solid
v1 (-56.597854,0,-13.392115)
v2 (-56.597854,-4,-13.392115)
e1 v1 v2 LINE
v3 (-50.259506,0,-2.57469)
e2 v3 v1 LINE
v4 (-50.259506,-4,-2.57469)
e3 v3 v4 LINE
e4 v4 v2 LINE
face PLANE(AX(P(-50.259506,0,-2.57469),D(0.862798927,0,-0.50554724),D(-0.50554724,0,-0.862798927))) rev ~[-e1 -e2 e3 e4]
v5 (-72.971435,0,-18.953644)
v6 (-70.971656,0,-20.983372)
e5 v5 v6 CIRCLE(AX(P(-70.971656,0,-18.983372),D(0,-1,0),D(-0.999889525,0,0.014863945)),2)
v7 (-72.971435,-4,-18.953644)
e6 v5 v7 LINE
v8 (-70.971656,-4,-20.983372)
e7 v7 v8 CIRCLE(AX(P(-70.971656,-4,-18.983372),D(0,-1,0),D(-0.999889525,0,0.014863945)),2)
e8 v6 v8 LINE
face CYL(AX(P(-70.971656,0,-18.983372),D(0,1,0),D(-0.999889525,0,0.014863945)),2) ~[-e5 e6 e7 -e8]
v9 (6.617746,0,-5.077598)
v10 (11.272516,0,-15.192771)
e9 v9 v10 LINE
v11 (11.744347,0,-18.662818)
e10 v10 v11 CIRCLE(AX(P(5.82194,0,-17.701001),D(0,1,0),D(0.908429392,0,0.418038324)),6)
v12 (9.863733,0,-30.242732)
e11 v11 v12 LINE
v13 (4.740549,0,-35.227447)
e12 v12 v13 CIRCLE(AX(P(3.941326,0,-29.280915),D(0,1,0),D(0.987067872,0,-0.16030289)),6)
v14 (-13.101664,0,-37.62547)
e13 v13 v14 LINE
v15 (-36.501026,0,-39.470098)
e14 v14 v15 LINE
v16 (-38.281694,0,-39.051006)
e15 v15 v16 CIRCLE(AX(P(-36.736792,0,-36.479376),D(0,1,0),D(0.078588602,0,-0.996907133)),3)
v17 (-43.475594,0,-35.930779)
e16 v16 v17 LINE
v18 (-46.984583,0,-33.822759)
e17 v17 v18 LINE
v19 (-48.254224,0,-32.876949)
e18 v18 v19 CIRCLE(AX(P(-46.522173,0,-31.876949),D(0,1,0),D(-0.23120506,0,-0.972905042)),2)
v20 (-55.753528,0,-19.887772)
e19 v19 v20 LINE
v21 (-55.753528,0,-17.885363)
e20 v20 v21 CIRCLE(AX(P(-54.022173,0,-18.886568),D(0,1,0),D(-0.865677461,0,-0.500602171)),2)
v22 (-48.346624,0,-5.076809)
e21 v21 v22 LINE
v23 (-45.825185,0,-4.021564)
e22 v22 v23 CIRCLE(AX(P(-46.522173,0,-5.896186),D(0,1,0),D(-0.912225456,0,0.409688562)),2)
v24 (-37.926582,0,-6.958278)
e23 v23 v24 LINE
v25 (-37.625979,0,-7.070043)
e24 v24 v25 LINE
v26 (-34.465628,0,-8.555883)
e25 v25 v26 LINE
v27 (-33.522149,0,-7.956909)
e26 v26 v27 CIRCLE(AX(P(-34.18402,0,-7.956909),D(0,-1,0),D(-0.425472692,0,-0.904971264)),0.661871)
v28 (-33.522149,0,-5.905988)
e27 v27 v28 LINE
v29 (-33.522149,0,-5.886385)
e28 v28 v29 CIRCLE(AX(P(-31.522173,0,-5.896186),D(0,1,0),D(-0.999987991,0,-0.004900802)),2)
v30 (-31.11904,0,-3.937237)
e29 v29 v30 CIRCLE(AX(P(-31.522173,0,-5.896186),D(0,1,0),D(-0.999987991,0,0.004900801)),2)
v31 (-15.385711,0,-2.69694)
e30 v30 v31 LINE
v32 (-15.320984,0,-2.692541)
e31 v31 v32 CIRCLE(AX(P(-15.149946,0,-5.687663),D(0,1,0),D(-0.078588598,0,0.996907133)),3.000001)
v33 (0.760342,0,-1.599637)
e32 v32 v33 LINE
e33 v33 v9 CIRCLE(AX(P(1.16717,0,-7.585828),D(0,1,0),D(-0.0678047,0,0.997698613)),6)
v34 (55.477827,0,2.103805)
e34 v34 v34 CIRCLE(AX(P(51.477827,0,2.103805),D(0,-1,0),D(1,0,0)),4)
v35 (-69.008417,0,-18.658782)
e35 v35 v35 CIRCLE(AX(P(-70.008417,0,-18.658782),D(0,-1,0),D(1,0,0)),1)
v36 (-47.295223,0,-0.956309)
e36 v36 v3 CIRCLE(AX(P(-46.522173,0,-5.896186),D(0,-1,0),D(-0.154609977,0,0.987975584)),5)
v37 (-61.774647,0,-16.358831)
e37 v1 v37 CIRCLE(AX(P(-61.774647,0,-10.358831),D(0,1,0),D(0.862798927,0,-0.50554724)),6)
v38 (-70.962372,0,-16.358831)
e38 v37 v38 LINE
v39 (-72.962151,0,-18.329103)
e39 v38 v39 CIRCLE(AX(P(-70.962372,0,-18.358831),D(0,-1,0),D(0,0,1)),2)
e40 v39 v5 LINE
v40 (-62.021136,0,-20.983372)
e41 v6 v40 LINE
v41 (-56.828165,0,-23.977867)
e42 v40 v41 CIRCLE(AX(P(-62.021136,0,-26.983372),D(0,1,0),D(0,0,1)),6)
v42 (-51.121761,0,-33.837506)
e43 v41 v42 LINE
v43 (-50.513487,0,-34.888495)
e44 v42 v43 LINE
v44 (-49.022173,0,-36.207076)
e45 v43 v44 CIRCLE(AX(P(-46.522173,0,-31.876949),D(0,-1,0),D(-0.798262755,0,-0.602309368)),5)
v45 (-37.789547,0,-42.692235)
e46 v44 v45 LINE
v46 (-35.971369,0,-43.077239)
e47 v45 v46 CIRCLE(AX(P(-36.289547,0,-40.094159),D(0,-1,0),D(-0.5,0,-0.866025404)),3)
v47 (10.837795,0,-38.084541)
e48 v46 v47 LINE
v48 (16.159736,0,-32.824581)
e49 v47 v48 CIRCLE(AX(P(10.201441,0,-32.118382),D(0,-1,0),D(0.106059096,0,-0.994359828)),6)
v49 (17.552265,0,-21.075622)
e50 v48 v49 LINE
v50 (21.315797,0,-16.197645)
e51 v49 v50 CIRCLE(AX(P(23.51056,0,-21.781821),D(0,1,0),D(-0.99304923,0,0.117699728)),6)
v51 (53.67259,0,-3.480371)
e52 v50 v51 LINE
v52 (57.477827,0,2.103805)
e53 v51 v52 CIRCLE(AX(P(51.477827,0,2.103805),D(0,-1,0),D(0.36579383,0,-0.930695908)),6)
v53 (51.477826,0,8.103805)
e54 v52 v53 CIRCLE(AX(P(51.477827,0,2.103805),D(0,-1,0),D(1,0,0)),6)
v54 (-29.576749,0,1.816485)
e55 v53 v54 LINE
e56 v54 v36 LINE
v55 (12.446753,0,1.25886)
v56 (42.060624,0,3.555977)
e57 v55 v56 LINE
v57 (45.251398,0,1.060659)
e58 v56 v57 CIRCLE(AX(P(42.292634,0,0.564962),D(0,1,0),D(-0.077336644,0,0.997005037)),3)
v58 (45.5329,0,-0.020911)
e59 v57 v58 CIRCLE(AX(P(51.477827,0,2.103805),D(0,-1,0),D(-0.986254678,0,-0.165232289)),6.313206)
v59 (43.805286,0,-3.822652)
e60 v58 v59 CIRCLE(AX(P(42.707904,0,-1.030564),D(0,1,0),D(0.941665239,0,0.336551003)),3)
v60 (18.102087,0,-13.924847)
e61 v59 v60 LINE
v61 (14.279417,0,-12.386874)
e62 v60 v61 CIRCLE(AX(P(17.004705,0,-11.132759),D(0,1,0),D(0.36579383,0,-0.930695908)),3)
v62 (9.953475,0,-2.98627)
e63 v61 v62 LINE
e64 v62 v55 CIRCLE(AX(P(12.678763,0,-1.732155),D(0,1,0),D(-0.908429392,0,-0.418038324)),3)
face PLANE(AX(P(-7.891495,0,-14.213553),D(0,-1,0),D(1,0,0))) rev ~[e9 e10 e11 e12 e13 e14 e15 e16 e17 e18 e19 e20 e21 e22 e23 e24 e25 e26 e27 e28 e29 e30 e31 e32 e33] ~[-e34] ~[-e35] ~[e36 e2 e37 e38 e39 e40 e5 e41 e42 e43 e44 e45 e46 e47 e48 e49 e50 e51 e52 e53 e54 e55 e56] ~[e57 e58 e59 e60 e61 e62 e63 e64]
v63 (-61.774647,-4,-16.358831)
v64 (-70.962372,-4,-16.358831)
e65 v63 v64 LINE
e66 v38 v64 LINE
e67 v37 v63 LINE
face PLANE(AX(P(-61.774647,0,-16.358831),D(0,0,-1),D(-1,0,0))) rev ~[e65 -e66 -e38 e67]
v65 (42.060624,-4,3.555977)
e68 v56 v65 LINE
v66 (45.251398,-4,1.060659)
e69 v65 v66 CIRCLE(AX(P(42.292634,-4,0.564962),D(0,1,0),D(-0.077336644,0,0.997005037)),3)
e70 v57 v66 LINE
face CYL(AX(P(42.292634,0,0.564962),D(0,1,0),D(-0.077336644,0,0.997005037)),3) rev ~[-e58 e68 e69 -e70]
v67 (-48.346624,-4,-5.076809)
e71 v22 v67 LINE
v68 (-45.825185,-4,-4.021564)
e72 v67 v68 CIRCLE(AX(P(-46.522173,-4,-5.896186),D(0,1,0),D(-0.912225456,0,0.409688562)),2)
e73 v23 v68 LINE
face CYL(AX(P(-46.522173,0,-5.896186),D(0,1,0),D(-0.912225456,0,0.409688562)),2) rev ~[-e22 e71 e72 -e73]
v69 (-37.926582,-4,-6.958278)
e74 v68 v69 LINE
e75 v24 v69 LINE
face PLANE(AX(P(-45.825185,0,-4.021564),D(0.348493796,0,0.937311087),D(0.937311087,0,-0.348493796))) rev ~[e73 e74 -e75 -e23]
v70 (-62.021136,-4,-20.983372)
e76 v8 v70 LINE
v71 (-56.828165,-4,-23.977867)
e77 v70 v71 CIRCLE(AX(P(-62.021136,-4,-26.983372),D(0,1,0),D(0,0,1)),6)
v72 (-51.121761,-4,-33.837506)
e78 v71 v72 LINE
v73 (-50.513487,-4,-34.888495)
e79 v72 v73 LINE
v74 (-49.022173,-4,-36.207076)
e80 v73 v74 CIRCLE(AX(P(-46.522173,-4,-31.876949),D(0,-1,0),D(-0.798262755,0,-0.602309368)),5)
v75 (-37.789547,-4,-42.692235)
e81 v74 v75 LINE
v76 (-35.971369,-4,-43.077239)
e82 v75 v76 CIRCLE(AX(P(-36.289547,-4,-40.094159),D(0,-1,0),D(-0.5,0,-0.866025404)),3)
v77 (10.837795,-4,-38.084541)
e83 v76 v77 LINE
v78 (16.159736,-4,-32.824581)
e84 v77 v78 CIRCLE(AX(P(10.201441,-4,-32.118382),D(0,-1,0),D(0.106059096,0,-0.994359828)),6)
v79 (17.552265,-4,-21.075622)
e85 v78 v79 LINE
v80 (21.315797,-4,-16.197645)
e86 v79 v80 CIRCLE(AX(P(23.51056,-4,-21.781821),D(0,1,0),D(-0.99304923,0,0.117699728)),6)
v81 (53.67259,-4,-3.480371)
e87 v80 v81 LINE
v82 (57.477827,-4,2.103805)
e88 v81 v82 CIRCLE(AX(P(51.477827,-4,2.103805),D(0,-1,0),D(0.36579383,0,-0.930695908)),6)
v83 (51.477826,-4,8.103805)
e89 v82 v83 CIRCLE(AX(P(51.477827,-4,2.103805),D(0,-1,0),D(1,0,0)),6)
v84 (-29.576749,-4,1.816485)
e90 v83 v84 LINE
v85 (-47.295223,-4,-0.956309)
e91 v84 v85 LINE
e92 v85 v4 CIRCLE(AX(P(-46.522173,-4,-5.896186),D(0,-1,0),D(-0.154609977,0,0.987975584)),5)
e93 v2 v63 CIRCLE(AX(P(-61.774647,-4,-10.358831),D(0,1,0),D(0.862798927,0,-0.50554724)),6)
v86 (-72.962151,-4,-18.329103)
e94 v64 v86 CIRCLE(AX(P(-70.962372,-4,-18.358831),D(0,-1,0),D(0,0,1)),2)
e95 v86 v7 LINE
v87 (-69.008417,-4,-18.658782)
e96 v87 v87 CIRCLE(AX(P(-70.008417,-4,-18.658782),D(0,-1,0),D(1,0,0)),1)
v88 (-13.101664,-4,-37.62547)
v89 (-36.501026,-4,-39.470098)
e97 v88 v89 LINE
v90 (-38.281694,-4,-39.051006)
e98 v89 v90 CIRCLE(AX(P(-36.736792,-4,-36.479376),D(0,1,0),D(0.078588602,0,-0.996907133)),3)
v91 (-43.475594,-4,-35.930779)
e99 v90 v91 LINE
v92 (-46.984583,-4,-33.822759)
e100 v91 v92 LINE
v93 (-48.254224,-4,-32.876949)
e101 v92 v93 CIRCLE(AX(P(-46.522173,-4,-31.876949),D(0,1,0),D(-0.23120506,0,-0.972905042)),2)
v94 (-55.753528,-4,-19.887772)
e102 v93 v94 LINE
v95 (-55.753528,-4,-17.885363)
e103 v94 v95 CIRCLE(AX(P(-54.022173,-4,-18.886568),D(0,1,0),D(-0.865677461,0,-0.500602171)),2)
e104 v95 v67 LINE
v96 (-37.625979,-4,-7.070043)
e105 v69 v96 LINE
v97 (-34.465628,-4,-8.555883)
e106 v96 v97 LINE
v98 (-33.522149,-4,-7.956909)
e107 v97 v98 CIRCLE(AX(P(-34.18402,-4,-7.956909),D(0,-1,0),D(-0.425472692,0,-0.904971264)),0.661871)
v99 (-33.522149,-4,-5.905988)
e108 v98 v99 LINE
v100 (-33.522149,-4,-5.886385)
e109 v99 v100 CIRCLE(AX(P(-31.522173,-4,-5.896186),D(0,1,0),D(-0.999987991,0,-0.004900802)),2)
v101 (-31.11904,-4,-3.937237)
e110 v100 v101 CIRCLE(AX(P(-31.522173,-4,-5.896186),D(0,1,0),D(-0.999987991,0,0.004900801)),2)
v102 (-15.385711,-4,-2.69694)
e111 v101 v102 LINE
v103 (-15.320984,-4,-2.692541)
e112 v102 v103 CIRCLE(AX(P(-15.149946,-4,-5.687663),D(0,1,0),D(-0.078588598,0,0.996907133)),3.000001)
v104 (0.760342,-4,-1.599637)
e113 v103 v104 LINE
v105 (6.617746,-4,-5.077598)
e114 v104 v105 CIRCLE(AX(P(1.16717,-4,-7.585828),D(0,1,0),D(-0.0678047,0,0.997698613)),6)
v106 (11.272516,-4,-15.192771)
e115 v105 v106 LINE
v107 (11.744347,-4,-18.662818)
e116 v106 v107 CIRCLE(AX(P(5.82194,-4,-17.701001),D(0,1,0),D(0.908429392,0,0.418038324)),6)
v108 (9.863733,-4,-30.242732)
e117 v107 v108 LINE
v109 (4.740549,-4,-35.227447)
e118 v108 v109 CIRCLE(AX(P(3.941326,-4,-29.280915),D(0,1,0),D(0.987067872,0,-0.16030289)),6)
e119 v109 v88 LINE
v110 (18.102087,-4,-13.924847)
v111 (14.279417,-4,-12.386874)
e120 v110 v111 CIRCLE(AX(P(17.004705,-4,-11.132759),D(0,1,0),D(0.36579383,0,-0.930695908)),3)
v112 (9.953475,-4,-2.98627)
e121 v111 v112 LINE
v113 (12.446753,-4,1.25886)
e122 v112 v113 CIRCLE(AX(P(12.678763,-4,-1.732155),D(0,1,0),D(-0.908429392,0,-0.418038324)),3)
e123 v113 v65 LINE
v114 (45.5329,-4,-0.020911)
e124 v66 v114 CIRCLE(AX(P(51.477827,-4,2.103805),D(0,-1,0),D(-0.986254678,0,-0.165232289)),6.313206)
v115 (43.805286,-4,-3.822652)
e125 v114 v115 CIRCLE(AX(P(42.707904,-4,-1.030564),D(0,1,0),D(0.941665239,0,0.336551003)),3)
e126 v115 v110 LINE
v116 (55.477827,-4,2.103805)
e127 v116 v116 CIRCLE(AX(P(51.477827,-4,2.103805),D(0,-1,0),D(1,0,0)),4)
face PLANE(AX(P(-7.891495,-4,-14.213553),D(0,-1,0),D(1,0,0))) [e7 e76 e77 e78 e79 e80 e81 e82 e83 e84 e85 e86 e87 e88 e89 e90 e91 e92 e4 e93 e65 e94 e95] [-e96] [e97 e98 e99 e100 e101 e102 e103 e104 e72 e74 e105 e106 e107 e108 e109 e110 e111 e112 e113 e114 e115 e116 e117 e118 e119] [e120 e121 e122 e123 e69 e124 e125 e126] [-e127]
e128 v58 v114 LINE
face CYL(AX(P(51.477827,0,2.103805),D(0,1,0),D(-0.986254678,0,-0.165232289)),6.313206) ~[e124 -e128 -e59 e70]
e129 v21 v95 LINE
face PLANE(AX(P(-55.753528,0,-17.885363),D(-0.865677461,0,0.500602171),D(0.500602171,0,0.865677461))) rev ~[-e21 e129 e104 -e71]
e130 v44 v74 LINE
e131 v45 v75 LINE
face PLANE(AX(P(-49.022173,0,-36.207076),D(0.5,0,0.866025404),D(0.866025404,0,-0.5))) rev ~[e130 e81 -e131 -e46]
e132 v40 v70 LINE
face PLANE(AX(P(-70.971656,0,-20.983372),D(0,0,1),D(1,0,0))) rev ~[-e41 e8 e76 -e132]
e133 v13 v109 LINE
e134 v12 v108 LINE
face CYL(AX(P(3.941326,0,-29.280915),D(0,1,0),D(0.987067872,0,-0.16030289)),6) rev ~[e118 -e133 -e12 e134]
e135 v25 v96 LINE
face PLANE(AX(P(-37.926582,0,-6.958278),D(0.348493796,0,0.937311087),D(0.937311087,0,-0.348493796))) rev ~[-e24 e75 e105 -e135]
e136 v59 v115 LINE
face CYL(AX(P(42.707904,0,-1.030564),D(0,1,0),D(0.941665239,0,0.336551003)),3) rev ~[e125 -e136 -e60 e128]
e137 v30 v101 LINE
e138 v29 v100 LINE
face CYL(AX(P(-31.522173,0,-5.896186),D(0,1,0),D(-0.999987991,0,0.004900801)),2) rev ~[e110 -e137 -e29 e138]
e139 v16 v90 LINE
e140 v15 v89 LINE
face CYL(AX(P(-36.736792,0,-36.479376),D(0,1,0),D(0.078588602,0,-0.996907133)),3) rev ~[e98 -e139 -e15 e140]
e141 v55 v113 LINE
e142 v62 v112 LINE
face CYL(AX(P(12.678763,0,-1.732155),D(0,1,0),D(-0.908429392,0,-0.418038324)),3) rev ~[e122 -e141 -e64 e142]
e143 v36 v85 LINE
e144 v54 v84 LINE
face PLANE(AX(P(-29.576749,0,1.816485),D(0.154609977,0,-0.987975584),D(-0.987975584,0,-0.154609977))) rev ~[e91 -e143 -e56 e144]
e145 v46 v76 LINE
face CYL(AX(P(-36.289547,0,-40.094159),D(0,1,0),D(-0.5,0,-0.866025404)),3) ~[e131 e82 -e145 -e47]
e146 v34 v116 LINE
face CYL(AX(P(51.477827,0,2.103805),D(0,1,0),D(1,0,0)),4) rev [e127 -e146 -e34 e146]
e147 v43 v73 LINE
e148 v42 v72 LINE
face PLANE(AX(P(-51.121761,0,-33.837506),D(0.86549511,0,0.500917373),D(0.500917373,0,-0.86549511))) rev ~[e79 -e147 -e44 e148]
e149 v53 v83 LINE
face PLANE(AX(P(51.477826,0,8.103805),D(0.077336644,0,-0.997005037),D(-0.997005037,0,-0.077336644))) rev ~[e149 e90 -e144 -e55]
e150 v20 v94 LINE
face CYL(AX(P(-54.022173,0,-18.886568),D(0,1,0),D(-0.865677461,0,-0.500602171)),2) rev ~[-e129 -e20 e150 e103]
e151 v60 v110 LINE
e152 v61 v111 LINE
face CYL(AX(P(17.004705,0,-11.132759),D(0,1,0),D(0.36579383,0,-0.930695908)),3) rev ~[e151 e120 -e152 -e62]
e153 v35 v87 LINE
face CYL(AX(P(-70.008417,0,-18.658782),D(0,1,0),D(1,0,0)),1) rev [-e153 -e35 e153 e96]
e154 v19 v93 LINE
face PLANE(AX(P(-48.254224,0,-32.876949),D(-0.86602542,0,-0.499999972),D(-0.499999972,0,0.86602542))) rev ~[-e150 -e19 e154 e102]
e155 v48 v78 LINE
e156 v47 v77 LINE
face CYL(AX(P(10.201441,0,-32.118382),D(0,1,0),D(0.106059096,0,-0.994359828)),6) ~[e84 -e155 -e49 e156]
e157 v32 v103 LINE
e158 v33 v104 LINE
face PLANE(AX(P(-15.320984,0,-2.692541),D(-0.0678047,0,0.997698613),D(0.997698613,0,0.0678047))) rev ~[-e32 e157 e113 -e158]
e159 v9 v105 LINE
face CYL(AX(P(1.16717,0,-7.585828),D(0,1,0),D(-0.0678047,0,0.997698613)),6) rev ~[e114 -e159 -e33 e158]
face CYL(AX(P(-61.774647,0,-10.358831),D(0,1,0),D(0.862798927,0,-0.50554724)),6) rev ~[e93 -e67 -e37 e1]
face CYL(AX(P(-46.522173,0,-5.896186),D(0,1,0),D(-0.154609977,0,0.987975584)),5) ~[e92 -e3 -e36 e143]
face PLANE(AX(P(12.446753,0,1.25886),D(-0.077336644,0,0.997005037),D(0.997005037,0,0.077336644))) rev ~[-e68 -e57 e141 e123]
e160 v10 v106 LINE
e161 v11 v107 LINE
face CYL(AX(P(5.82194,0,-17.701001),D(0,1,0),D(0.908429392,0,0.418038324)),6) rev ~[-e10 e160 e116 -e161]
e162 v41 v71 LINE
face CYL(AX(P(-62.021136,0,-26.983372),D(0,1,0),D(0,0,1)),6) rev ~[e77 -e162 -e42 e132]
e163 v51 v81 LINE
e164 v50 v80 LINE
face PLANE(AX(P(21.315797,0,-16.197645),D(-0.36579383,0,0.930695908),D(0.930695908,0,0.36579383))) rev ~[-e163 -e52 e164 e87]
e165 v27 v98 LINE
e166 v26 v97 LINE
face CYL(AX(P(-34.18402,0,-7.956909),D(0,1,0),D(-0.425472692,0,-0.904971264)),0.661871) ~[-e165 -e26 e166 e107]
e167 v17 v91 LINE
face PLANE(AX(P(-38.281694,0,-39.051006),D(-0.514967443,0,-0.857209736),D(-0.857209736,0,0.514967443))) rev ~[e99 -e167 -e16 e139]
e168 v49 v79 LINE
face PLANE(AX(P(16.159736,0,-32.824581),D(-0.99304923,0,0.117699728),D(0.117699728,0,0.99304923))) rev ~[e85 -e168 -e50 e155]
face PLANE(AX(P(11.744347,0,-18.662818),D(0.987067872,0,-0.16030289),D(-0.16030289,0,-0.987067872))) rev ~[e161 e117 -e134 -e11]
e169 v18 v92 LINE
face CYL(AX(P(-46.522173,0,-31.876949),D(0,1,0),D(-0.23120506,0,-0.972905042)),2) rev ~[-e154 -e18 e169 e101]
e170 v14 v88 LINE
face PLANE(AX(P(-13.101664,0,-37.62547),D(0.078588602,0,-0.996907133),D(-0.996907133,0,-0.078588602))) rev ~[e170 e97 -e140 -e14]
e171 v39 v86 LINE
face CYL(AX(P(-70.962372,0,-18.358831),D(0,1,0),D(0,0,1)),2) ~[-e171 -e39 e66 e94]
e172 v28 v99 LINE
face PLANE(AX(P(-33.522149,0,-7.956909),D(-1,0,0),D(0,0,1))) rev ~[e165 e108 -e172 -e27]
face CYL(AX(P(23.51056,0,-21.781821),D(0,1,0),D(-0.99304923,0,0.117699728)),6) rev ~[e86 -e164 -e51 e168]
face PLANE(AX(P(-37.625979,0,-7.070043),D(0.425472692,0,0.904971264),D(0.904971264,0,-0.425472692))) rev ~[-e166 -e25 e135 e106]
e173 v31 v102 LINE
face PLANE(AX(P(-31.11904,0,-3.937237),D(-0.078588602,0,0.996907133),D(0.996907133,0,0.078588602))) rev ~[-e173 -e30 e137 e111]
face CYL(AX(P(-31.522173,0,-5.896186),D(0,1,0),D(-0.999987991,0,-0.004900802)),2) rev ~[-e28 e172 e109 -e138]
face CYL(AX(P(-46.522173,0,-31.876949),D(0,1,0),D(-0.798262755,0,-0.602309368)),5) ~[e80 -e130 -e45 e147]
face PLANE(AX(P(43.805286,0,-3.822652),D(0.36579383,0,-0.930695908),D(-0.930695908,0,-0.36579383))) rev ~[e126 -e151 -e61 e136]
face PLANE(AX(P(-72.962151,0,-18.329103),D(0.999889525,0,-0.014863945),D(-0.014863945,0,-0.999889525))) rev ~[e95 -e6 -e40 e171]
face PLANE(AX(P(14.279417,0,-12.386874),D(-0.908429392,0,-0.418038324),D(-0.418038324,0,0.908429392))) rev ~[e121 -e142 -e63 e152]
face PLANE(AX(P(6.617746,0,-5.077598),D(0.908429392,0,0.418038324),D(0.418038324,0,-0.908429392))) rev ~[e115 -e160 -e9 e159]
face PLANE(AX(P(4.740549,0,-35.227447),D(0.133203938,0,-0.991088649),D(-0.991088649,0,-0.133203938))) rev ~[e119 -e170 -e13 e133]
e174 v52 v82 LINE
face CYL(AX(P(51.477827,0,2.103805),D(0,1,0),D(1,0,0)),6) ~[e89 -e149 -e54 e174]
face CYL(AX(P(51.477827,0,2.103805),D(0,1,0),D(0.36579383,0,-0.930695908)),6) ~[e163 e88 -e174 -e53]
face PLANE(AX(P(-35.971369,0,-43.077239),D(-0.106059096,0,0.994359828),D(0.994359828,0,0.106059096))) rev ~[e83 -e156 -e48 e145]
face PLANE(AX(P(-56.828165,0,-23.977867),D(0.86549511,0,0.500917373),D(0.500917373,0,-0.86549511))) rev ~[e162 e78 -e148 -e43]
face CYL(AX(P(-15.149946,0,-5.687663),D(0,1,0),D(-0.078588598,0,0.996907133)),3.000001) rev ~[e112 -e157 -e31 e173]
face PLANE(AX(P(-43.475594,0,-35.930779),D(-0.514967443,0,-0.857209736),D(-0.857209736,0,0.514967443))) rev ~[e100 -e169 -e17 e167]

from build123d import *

# Parameters (mm, degrees)
F1_R     = 1
F1_R_2   = 4
F2_DEPTH = 4


# Not quite as in the source:
# - a feature names something its author has since deleted; it is built from what else it names


with BuildPart() as f2:
    # F1 (on Front) → F2 (new body)
    with BuildSketch(Plane.XZ):
        with BuildLine():
            ThreePointArc((53.6725900561, -3.4803708923), (56.4360817028, -1.2749098512), (57.4778270766, 2.1038045583))
            ThreePointArc((57.4778270766, 2.1038045583), (55.7204672392, 6.3464457699), (51.4778255932, 8.1038045583))
            Line((51.4778255932, 8.1038045583), (-29.5767494715, 1.8164854333))
            Line((-29.5767494715, 1.8164854333), (-47.2952228074, -0.9563085456))
            ThreePointArc((-47.2952228074, -0.9563085456), (-48.9181443858, -1.5076422035), (-50.2595064205, -2.5746900675))
            Line((-50.2595064205, -2.5746900675), (-56.5978536574, -13.3921147633))
            ThreePointArc((-56.5978536574, -13.3921147633), (-58.7913353541, -15.5645829823), (-61.7746472195, -16.3588313254))
            Line((-61.7746472195, -16.3588313254), (-70.9623719458, -16.3588313254))
            ThreePointArc((-70.9623719458, -16.3588313254), (-72.3660357626, -16.9341461359), (-72.9621509967, -18.3291034361))
            Line((-72.9621509967, -18.3291034361), (-72.9714351561, -18.9536438246))
            ThreePointArc((-72.9714351561, -18.9536438246), (-72.3963412947, -20.3870355307), (-70.9716561052, -20.9833717139))
            Line((-70.9716561052, -20.9833717139), (-62.0211355409, -20.9833717139))
            ThreePointArc((-62.0211355409, -20.9833717139), (-59.0238889239, -21.7856305971), (-56.8281648814, -23.977867475))
            Line((-56.8281648814, -23.977867475), (-51.1217613336, -33.8375062708))
            Line((-51.1217613336, -33.8375062708), (-50.5134866975, -34.8884954183))
            ThreePointArc((-50.5134866975, -34.8884954183), (-49.834113752, -35.622752626), (-49.0221729234, -36.2070755993))
            Line((-49.0221729234, -36.2070755993), (-37.7895467449, -42.6922353472))
            ThreePointArc((-37.7895467449, -42.6922353472), (-36.9110233024, -43.029081092), (-35.9713694581, -43.0772386209))
            Line((-35.9713694581, -43.0772386209), (10.8377953956, -38.0845412605))
            ThreePointArc((10.8377953956, -38.0845412605), (14.4191592098, -36.3857997297), (16.1597362046, -32.824580657))
            Line((16.1597362046, -32.824580657), (17.5522645357, -21.0756224064))
            ThreePointArc((17.5522645357, -21.0756224064), (18.760112016, -18.1166816586), (21.3157969388, -16.1976453223))
            Line((21.3157969388, -16.1976453223), (53.6725900561, -3.4803708923))
        make_face()
        with Locations((-70.0084173118, -18.6587822488)):
            Circle(F1_R, mode=Mode.SUBTRACT)
        with BuildLine():
            ThreePointArc((-33.5221489054, -5.8863848639), (-32.7820426942, -4.3428905644), (-31.1190403454, -3.9372367165))
            Line((-31.1190403454, -3.9372367165), (-15.3857114758, -2.6969403245))
            ThreePointArc((-15.3857114758, -2.6969403245), (-15.3533597704, -2.6945658839), (-15.320984282, -2.6925413929))
            Line((-15.320984282, -2.6925413929), (0.7603415418, -1.5996367209))
            ThreePointArc((0.7603415418, -1.5996367209), (4.2304854801, -2.4267493449), (6.6177460931, -5.0775984562))
            Line((6.6177460931, -5.0775984562), (11.2725159026, -15.1927708333))
            ThreePointArc((11.2725159026, -15.1927708333), (11.7672314644, -16.8926047847), (11.7443467828, -18.6628181167))
            Line((11.7443467828, -18.6628181167), (9.8637327358, -30.2427322728))
            ThreePointArc((9.8637327358, -30.2427322728), (8.1254532697, -33.5812724587), (4.7405491326, -35.2274468291))
            Line((4.7405491326, -35.2274468291), (-13.1016644536, -37.6254695609))
            Line((-13.1016644536, -37.6254695609), (-36.5010263621, -39.4700978904))
            ThreePointArc((-36.5010263621, -39.4700978904), (-37.4240833549, -39.3995872417), (-38.2816944982, -39.0510057009))
            Line((-38.2816944982, -39.0510057009), (-43.475593846, -35.9307785793))
            Line((-43.475593846, -35.9307785793), (-46.9845830439, -33.8227586638))
            ThreePointArc((-46.9845830439, -33.8227586638), (-47.7169758073, -33.480833261), (-48.2542237632, -32.8769485246))
            Line((-48.2542237632, -32.8769485246), (-55.7535278454, -19.8877718654))
            ThreePointArc((-55.7535278454, -19.8877718654), (-56.0221729234, -18.8865675237), (-55.7535278454, -17.8853631819))
            Line((-55.7535278454, -17.8853631819), (-48.3466238348, -5.0768093424))
            ThreePointArc((-48.3466238348, -5.0768093424), (-47.2942991525, -4.0512417288), (-45.8251853322, -4.0215642922))
            Line((-45.8251853322, -4.0215642922), (-37.9265817129, -6.9582780391))
            Line((-37.9265817129, -6.9582780391), (-37.6259790546, -7.0700425992))
            Line((-37.6259790546, -7.0700425992), (-34.4656276648, -8.5558833842))
            ThreePointArc((-34.4656276648, -8.5558833842), (-33.8292769309, -8.5156852397), (-33.5221489054, -7.9569093245))
            Line((-33.5221489054, -7.9569093245), (-33.5221489054, -5.9059880699))
            ThreePointArc((-33.5221489054, -5.9059880699), (-33.5221729234, -5.8961864669), (-33.5221489054, -5.8863848639))
        make_face(mode=Mode.SUBTRACT)
        with BuildLine():
            ThreePointArc((9.9534750477, -2.9862699605), (10.0919340096, -0.2128411234), (12.4467532901, 1.2588601217))
            Line((12.4467532901, 1.2588601217), (42.0606238873, 3.555977278))
            ThreePointArc((42.0606238873, 3.555977278), (44.1407275048, 2.9281273611), (45.2513978552, 1.0606590347))
            ThreePointArc((45.2513978552, 1.0606590347), (45.3681686541, 0.5136324312), (45.5329001833, -0.0209113441))
            ThreePointArc((45.5329001833, -0.0209113441), (45.4391256015, -2.2717054042), (43.8052859559, -3.8226520781))
            Line((43.8052859559, -3.8226520781), (18.1020868014, -13.9248471934))
            ThreePointArc((18.1020868014, -13.9248471934), (15.884946368, -13.9159482702), (14.2794171364, -12.3868744398))
            Line((14.2794171364, -12.3868744398), (9.9534750477, -2.9862699605))
        make_face(mode=Mode.SUBTRACT)
        with Locations((51.4778270766, 2.1038045583)):
            Circle(F1_R_2, mode=Mode.SUBTRACT)
    extrude(amount=F2_DEPTH)


solid = f2.part
